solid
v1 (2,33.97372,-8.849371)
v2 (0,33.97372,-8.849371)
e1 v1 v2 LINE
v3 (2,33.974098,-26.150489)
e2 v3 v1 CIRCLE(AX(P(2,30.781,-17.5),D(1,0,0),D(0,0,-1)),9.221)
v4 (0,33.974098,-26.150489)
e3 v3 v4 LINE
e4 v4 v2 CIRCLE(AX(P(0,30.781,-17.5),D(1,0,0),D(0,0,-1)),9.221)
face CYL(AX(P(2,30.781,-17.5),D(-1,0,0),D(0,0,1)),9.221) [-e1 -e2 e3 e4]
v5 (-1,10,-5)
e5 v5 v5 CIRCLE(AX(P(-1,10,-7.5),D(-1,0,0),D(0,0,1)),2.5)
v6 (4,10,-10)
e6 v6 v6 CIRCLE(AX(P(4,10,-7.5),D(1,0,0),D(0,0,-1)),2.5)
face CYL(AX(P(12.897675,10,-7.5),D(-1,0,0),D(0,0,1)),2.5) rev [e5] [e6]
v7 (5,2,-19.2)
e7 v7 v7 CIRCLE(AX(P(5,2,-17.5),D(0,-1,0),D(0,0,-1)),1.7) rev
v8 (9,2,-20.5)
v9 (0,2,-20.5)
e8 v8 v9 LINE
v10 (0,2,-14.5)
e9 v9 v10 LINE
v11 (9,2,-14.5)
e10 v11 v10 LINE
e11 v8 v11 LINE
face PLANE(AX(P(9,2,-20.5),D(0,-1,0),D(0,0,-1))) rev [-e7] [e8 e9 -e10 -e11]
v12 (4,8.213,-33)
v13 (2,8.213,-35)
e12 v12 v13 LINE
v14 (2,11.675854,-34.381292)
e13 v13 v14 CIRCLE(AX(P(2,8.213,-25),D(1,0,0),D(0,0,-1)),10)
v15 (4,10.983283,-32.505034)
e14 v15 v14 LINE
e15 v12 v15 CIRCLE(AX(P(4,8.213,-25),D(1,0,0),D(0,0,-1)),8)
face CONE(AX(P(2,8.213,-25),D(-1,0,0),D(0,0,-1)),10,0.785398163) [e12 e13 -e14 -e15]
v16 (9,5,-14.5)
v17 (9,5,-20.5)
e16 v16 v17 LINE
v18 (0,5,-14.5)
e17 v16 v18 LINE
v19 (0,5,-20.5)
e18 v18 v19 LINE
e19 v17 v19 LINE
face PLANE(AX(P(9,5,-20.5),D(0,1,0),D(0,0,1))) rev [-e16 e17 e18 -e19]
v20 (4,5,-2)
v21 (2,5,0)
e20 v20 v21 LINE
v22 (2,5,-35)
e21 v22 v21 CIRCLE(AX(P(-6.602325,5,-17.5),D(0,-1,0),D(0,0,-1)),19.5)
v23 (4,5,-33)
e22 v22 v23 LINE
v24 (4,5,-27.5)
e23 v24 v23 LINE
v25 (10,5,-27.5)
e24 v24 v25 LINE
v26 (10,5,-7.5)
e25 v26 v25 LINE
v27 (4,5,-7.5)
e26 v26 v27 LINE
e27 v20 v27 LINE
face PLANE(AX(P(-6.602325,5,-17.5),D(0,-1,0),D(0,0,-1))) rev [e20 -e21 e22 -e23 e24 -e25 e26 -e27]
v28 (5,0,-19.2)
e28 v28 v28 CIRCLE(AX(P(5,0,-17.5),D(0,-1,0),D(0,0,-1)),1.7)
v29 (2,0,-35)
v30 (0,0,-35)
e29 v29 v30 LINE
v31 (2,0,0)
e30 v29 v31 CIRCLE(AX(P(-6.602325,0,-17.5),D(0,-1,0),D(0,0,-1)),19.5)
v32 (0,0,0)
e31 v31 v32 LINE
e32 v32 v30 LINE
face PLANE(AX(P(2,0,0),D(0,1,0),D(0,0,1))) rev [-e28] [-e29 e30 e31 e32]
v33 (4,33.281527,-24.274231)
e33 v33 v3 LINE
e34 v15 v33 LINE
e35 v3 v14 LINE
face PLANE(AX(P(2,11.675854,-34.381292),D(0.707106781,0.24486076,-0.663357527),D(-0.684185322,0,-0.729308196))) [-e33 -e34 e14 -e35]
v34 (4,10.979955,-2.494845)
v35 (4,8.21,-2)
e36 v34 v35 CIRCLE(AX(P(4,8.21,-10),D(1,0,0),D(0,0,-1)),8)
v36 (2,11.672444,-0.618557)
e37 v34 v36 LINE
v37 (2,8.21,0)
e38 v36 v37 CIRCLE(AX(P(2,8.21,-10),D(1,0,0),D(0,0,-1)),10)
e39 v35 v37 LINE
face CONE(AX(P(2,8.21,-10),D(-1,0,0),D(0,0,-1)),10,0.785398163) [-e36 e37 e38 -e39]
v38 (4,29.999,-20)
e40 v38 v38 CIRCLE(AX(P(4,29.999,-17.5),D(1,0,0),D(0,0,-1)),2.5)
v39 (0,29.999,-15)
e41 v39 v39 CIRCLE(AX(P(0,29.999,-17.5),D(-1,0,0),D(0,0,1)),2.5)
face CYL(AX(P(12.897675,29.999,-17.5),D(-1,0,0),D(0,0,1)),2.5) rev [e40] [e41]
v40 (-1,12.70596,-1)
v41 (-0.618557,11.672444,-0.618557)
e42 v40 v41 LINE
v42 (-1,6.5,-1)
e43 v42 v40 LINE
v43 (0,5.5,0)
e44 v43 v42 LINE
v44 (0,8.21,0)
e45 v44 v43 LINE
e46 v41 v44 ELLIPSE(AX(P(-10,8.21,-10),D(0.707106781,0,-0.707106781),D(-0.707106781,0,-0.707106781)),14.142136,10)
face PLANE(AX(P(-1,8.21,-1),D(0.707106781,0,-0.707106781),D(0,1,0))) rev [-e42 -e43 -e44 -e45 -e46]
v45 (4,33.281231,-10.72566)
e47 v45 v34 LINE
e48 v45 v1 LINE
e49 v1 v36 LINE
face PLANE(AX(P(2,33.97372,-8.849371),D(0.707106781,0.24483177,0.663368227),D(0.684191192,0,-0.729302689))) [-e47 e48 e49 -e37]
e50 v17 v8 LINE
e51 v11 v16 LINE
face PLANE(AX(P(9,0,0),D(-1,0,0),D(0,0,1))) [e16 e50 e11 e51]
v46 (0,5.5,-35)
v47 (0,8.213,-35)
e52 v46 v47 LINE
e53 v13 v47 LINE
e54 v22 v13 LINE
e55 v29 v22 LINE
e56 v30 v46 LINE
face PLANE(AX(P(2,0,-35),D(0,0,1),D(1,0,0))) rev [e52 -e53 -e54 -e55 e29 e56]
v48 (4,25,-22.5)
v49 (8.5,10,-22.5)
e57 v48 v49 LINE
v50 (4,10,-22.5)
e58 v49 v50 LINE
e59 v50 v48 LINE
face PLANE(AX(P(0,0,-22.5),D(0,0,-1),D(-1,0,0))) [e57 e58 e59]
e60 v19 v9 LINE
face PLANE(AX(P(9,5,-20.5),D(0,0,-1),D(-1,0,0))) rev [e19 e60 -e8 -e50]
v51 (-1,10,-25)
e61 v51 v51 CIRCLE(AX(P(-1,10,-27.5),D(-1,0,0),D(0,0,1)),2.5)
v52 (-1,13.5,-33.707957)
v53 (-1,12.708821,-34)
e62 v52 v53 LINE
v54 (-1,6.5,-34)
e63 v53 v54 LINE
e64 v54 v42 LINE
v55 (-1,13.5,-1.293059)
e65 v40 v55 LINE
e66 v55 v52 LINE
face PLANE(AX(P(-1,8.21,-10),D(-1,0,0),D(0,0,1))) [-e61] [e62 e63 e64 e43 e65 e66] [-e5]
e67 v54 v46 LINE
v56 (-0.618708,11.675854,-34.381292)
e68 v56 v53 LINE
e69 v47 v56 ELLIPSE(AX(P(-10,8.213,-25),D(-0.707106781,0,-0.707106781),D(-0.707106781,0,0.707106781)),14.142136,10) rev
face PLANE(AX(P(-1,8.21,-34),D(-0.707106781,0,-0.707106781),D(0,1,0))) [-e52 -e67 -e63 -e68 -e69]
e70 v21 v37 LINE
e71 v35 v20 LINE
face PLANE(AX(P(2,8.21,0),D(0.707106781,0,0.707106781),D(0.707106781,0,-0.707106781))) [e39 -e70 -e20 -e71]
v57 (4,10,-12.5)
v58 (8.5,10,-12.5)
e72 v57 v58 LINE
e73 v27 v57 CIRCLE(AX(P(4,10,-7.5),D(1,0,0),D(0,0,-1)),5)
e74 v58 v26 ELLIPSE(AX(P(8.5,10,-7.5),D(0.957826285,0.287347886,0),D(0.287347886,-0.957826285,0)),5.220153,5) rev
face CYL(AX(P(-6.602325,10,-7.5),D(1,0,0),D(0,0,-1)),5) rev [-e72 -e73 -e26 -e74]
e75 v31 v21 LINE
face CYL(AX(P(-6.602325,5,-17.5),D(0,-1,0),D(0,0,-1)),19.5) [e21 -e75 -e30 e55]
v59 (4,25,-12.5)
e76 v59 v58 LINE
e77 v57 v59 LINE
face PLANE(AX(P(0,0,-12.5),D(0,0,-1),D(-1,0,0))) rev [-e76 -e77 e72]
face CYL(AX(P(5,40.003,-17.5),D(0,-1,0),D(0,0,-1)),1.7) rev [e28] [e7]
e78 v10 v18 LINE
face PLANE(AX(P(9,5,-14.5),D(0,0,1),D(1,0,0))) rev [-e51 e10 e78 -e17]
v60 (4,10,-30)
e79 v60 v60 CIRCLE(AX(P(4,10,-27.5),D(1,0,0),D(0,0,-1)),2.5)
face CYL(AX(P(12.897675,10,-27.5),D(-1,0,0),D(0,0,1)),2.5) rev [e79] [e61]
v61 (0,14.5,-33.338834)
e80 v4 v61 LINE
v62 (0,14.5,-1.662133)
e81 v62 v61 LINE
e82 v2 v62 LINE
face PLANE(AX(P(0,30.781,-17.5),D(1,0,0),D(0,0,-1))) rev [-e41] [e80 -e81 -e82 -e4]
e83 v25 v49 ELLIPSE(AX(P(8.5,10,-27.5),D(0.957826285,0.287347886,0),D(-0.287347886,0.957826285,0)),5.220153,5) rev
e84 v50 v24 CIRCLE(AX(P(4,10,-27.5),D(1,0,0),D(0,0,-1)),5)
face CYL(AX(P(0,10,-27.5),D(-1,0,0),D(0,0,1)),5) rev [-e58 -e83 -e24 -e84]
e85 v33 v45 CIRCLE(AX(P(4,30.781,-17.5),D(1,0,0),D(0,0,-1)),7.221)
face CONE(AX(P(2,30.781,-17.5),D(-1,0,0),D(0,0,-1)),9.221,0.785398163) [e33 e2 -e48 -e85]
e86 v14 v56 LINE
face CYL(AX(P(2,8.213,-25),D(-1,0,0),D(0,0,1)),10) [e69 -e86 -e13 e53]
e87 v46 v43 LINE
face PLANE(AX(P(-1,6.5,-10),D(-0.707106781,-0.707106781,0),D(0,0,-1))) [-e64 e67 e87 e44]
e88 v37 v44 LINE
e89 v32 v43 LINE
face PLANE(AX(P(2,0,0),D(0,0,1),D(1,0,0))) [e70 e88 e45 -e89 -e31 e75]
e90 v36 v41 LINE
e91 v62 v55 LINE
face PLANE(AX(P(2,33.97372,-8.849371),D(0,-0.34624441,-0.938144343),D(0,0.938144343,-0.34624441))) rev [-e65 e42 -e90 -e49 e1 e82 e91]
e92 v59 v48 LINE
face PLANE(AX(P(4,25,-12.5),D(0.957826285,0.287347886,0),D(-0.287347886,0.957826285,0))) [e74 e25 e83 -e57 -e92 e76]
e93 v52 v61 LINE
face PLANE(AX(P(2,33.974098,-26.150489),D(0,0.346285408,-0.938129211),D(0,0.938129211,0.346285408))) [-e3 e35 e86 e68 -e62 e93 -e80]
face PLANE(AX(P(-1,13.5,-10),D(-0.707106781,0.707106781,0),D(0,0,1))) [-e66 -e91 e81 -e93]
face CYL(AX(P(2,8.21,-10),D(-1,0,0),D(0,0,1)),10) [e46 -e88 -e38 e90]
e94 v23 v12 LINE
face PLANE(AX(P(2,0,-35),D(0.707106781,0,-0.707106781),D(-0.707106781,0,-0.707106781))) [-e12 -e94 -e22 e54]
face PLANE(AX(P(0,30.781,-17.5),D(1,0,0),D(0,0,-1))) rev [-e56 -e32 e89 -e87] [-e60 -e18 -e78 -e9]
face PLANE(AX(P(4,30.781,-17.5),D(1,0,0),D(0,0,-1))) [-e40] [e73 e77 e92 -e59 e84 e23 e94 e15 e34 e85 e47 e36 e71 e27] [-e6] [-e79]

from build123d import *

# Parameters (mm, degrees)
BOSS_EXTRUDE1_DEPTH = 2
BOSS_EXTRUDE2_DEPTH = 2
BOSS_EXTRUDE2_TAPER = 45
BOSS_EXTRUDE3_DEPTH = 5
BOSS_EXTRUDE4_START = 1
BOSS_EXTRUDE4_DEPTH = 1
CHAMFER1_SIZE       = 1
SKETCH6_R           = 2.5
CUT_EXTRUDE1_DEPTH  = 55.939106152
SKETCH8_R           = 2.5
CUT_EXTRUDE2_DEPTH  = 55.694698419
BOSS_EXTRUDE5_DEPTH = 10
FILLET1_R           = 5
SKETCH10_W          = 6
SKETCH10_H          = 3
CUT_EXTRUDE3_DEPTH  = 9
CUT_EXTRUDE4_REACH  = 56.695
SKETCH11_R          = 1.7


# Some blends are built 0.0001 mm under size
with BuildPart() as part:
    # Sketch1 → Boss-Extrude1 (new body)
    with BuildSketch(Plane(origin=(0, 0, 0), x_dir=(0, 0, -1), z_dir=(1, 0, 0))):
        with BuildLine():
            Line((0, 0), (35, 0))
            Line((35, 0), (35, 8.213))
            ThreePointArc((35, 8.213), (34.84410791, 9.971846057), (34.381292109, 11.675854077))
            Line((34.381292109, 11.675854077), (26.150489454, 33.974097745))
            ThreePointArc((26.150489454, 33.974097745), (17.499798515, 40.001999998), (8.849371011, 33.973719703))
            Line((8.849371011, 33.973719703), (0.618556568, 11.672444098))
            ThreePointArc((0.618556568, 11.672444098), (0.15585366, 9.968630956), (0, 8.21))
            Line((0, 8.21), (0, 0))
        make_face()
    extrude(amount=BOSS_EXTRUDE1_DEPTH)

    # Sketch2 → Boss-Extrude2 (add)
    with BuildSketch(Plane(origin=(2, 0, 0), x_dir=(0, 0, -1), z_dir=(1, 0, 0))):
        with BuildLine():
            Line((8.849371011, 33.973719703), (0.618556568, 11.672444098))
            ThreePointArc((0.618556568, 11.672444098), (0.15585366, 9.968630956), (0, 8.21))
            Line((0, 8.21), (0, 0))
            Line((0, 0), (35, 0))
            Line((35, 0), (35, 8.213))
            ThreePointArc((35, 8.213), (34.84410791, 9.971846057), (34.381292109, 11.675854077))
            Line((34.381292109, 11.675854077), (26.150489454, 33.974097745))
            ThreePointArc((26.150489454, 33.974097745), (17.499798515, 40.001999998), (8.849371011, 33.973719703))
        make_face()
    extrude(amount=BOSS_EXTRUDE2_DEPTH, taper=BOSS_EXTRUDE2_TAPER)

    # Sketch4 → Boss-Extrude3 (add)
    with BuildSketch(Plane.XZ):
        with BuildLine():
            Line((0, 0), (2, 0))
            ThreePointArc((2, 0), (12.897674733, -17.5), (2, -35))
            Line((2, -35), (0, -35))
            Line((0, -35), (0, 0))
        make_face()
    extrude(amount=-BOSS_EXTRUDE3_DEPTH)

    # Sketch5 → Boss-Extrude4 (add)
    with BuildSketch(Plane.ZY.offset(BOSS_EXTRUDE4_START)):
        with BuildLine():
            Line((0, 5.5), (0, 8.21))
            ThreePointArc((0, 8.21), (-0.15585366, 9.968630956), (-0.618556568, 11.672444098))
            Line((-0.618556568, 11.672444098), (-1.662133105, 14.5))
            Line((-1.662133105, 14.5), (-33.338833873, 14.5))
            Line((-33.338833873, 14.5), (-34.381292109, 11.675854077))
            ThreePointArc((-34.381292109, 11.675854077), (-34.84410791, 9.971846057), (-35, 8.213))
            Line((-35, 8.213), (-35, 5.5))
            Line((-35, 5.5), (0, 5.5))
        make_face()
    extrude(amount=-BOSS_EXTRUDE4_DEPTH)

    # Chamfer1
    chamfer1_edges = [part.edges().sort_by_distance(p)[0] for p in [
        (-1, 14.5, -17.500483489),
        (-1, 5.5, -17.5),
    ]]
    chamfer(chamfer1_edges, length=CHAMFER1_SIZE - 0.0001)  # a hair under: the kernel refuses the full size

    # Chamfer2
    # the kernel refuses this chamfer: 1 mm, written as the material it takes off along each edge
    with BuildSketch(Plane(origin=(-1, 0.327860829, 0), x_dir=(-0.027495876610586275, 0, -0.9996219169112968), z_dir=(0, 1, 0))) as chamfer2_piece_1:
        with BuildLine():
            Line((1.028673195, 0), (-0.056547155, -1.027117794))
            Line((-0.056547155, -1.027117794), (-0.076539593, -1.026567876))
            ThreePointArc((-0.076539593, -1.026567876), (-0.034129227, -0.51339783), (-0.019992438, 0.000549918))
            Line((-0.019992438, 0.000549918), (0.000549918, 0.019992438))
            ThreePointArc((0.000549918, 0.019992438), (0.514497665, 0.00585565), (1.029223113, 0.019992438))
            Line((1.029223113, 0.019992438), (1.028673195, 0))
        make_face()
    extrude(amount=14.054178342, mode=Mode.SUBTRACT)
    with BuildSketch(Plane(origin=(-1, 14.385039171, -35), x_dir=(-0.0274958766105862, 0, 0.9996219169112968), z_dir=(0, -1, 0))) as chamfer2_piece_2:
        with BuildLine():
            Line((1.028673195, 0), (-0.056547155, -1.027117794))
            Line((-0.056547155, -1.027117794), (-0.076539593, -1.026567876))
            ThreePointArc((-0.076539593, -1.026567876), (-0.034129227, -0.51339783), (-0.019992438, 0.000549918))
            Line((-0.019992438, 0.000549918), (0.000549918, 0.019992438))
            ThreePointArc((0.000549918, 0.019992438), (0.514497665, 0.00585565), (1.029223113, 0.019992438))
            Line((1.029223113, 0.019992438), (1.028673195, 0))
        make_face()
    extrude(amount=14.057178342, mode=Mode.SUBTRACT)

    # Sketch6 → Cut-Extrude1 (cut, through all)
    with BuildSketch(Plane.ZY.offset(1)):
        with Locations((-27.5, 10)):
            Circle(SKETCH6_R)
        with Locations((-7.5, 10)):
            Circle(SKETCH6_R)
    extrude(amount=-CUT_EXTRUDE1_DEPTH, mode=Mode.SUBTRACT)

    # Sketch8 → Cut-Extrude2 (cut, through all)
    with BuildSketch(Plane.ZY):
        with Locations((-17.5, 29.999)):
            Circle(SKETCH8_R)
    extrude(amount=-CUT_EXTRUDE2_DEPTH, mode=Mode.SUBTRACT)

    # Sketch9 → Boss-Extrude5 (add)
    with BuildSketch(Plane(origin=(0, 0, -22.5), x_dir=(-1, 0, 0), z_dir=(0, 0, -1))):
        Polygon((-4, 5), (-4, 25), (-10, 5), align=None)
    extrude(amount=-BOSS_EXTRUDE5_DEPTH)

    # Fillet1
    fillet1_edges = [part.edges().sort_by_distance(p)[0] for p in [
        (7, 5, -12.5),
        (7, 5, -22.5),
    ]]
    fillet(fillet1_edges, radius=FILLET1_R)

    # Sketch10 → Cut-Extrude3 (cut)
    with BuildSketch(Plane.ZY):
        with Locations((-17.5, 3.5)):
            Rectangle(SKETCH10_W, SKETCH10_H)
    extrude(amount=-CUT_EXTRUDE3_DEPTH, mode=Mode.SUBTRACT)

    # Sketch11 → Cut-Extrude4 (cut, up to next)
    with BuildSketch(Plane.XZ, mode=Mode.PRIVATE) as cut_extrude4_sk1:
        with Locations(Location((5, -17.5, 0), (0, 0, 270))):
            Circle(SKETCH11_R)
    cut_extrude4_tool1 = extrude(cut_extrude4_sk1.sketch, amount=-CUT_EXTRUDE4_REACH, mode=Mode.PRIVATE) & part.part
    add(cut_extrude4_tool1.solids().sort_by_distance((5, 0, -17.5))[0], mode=Mode.SUBTRACT)


solid = part.part
